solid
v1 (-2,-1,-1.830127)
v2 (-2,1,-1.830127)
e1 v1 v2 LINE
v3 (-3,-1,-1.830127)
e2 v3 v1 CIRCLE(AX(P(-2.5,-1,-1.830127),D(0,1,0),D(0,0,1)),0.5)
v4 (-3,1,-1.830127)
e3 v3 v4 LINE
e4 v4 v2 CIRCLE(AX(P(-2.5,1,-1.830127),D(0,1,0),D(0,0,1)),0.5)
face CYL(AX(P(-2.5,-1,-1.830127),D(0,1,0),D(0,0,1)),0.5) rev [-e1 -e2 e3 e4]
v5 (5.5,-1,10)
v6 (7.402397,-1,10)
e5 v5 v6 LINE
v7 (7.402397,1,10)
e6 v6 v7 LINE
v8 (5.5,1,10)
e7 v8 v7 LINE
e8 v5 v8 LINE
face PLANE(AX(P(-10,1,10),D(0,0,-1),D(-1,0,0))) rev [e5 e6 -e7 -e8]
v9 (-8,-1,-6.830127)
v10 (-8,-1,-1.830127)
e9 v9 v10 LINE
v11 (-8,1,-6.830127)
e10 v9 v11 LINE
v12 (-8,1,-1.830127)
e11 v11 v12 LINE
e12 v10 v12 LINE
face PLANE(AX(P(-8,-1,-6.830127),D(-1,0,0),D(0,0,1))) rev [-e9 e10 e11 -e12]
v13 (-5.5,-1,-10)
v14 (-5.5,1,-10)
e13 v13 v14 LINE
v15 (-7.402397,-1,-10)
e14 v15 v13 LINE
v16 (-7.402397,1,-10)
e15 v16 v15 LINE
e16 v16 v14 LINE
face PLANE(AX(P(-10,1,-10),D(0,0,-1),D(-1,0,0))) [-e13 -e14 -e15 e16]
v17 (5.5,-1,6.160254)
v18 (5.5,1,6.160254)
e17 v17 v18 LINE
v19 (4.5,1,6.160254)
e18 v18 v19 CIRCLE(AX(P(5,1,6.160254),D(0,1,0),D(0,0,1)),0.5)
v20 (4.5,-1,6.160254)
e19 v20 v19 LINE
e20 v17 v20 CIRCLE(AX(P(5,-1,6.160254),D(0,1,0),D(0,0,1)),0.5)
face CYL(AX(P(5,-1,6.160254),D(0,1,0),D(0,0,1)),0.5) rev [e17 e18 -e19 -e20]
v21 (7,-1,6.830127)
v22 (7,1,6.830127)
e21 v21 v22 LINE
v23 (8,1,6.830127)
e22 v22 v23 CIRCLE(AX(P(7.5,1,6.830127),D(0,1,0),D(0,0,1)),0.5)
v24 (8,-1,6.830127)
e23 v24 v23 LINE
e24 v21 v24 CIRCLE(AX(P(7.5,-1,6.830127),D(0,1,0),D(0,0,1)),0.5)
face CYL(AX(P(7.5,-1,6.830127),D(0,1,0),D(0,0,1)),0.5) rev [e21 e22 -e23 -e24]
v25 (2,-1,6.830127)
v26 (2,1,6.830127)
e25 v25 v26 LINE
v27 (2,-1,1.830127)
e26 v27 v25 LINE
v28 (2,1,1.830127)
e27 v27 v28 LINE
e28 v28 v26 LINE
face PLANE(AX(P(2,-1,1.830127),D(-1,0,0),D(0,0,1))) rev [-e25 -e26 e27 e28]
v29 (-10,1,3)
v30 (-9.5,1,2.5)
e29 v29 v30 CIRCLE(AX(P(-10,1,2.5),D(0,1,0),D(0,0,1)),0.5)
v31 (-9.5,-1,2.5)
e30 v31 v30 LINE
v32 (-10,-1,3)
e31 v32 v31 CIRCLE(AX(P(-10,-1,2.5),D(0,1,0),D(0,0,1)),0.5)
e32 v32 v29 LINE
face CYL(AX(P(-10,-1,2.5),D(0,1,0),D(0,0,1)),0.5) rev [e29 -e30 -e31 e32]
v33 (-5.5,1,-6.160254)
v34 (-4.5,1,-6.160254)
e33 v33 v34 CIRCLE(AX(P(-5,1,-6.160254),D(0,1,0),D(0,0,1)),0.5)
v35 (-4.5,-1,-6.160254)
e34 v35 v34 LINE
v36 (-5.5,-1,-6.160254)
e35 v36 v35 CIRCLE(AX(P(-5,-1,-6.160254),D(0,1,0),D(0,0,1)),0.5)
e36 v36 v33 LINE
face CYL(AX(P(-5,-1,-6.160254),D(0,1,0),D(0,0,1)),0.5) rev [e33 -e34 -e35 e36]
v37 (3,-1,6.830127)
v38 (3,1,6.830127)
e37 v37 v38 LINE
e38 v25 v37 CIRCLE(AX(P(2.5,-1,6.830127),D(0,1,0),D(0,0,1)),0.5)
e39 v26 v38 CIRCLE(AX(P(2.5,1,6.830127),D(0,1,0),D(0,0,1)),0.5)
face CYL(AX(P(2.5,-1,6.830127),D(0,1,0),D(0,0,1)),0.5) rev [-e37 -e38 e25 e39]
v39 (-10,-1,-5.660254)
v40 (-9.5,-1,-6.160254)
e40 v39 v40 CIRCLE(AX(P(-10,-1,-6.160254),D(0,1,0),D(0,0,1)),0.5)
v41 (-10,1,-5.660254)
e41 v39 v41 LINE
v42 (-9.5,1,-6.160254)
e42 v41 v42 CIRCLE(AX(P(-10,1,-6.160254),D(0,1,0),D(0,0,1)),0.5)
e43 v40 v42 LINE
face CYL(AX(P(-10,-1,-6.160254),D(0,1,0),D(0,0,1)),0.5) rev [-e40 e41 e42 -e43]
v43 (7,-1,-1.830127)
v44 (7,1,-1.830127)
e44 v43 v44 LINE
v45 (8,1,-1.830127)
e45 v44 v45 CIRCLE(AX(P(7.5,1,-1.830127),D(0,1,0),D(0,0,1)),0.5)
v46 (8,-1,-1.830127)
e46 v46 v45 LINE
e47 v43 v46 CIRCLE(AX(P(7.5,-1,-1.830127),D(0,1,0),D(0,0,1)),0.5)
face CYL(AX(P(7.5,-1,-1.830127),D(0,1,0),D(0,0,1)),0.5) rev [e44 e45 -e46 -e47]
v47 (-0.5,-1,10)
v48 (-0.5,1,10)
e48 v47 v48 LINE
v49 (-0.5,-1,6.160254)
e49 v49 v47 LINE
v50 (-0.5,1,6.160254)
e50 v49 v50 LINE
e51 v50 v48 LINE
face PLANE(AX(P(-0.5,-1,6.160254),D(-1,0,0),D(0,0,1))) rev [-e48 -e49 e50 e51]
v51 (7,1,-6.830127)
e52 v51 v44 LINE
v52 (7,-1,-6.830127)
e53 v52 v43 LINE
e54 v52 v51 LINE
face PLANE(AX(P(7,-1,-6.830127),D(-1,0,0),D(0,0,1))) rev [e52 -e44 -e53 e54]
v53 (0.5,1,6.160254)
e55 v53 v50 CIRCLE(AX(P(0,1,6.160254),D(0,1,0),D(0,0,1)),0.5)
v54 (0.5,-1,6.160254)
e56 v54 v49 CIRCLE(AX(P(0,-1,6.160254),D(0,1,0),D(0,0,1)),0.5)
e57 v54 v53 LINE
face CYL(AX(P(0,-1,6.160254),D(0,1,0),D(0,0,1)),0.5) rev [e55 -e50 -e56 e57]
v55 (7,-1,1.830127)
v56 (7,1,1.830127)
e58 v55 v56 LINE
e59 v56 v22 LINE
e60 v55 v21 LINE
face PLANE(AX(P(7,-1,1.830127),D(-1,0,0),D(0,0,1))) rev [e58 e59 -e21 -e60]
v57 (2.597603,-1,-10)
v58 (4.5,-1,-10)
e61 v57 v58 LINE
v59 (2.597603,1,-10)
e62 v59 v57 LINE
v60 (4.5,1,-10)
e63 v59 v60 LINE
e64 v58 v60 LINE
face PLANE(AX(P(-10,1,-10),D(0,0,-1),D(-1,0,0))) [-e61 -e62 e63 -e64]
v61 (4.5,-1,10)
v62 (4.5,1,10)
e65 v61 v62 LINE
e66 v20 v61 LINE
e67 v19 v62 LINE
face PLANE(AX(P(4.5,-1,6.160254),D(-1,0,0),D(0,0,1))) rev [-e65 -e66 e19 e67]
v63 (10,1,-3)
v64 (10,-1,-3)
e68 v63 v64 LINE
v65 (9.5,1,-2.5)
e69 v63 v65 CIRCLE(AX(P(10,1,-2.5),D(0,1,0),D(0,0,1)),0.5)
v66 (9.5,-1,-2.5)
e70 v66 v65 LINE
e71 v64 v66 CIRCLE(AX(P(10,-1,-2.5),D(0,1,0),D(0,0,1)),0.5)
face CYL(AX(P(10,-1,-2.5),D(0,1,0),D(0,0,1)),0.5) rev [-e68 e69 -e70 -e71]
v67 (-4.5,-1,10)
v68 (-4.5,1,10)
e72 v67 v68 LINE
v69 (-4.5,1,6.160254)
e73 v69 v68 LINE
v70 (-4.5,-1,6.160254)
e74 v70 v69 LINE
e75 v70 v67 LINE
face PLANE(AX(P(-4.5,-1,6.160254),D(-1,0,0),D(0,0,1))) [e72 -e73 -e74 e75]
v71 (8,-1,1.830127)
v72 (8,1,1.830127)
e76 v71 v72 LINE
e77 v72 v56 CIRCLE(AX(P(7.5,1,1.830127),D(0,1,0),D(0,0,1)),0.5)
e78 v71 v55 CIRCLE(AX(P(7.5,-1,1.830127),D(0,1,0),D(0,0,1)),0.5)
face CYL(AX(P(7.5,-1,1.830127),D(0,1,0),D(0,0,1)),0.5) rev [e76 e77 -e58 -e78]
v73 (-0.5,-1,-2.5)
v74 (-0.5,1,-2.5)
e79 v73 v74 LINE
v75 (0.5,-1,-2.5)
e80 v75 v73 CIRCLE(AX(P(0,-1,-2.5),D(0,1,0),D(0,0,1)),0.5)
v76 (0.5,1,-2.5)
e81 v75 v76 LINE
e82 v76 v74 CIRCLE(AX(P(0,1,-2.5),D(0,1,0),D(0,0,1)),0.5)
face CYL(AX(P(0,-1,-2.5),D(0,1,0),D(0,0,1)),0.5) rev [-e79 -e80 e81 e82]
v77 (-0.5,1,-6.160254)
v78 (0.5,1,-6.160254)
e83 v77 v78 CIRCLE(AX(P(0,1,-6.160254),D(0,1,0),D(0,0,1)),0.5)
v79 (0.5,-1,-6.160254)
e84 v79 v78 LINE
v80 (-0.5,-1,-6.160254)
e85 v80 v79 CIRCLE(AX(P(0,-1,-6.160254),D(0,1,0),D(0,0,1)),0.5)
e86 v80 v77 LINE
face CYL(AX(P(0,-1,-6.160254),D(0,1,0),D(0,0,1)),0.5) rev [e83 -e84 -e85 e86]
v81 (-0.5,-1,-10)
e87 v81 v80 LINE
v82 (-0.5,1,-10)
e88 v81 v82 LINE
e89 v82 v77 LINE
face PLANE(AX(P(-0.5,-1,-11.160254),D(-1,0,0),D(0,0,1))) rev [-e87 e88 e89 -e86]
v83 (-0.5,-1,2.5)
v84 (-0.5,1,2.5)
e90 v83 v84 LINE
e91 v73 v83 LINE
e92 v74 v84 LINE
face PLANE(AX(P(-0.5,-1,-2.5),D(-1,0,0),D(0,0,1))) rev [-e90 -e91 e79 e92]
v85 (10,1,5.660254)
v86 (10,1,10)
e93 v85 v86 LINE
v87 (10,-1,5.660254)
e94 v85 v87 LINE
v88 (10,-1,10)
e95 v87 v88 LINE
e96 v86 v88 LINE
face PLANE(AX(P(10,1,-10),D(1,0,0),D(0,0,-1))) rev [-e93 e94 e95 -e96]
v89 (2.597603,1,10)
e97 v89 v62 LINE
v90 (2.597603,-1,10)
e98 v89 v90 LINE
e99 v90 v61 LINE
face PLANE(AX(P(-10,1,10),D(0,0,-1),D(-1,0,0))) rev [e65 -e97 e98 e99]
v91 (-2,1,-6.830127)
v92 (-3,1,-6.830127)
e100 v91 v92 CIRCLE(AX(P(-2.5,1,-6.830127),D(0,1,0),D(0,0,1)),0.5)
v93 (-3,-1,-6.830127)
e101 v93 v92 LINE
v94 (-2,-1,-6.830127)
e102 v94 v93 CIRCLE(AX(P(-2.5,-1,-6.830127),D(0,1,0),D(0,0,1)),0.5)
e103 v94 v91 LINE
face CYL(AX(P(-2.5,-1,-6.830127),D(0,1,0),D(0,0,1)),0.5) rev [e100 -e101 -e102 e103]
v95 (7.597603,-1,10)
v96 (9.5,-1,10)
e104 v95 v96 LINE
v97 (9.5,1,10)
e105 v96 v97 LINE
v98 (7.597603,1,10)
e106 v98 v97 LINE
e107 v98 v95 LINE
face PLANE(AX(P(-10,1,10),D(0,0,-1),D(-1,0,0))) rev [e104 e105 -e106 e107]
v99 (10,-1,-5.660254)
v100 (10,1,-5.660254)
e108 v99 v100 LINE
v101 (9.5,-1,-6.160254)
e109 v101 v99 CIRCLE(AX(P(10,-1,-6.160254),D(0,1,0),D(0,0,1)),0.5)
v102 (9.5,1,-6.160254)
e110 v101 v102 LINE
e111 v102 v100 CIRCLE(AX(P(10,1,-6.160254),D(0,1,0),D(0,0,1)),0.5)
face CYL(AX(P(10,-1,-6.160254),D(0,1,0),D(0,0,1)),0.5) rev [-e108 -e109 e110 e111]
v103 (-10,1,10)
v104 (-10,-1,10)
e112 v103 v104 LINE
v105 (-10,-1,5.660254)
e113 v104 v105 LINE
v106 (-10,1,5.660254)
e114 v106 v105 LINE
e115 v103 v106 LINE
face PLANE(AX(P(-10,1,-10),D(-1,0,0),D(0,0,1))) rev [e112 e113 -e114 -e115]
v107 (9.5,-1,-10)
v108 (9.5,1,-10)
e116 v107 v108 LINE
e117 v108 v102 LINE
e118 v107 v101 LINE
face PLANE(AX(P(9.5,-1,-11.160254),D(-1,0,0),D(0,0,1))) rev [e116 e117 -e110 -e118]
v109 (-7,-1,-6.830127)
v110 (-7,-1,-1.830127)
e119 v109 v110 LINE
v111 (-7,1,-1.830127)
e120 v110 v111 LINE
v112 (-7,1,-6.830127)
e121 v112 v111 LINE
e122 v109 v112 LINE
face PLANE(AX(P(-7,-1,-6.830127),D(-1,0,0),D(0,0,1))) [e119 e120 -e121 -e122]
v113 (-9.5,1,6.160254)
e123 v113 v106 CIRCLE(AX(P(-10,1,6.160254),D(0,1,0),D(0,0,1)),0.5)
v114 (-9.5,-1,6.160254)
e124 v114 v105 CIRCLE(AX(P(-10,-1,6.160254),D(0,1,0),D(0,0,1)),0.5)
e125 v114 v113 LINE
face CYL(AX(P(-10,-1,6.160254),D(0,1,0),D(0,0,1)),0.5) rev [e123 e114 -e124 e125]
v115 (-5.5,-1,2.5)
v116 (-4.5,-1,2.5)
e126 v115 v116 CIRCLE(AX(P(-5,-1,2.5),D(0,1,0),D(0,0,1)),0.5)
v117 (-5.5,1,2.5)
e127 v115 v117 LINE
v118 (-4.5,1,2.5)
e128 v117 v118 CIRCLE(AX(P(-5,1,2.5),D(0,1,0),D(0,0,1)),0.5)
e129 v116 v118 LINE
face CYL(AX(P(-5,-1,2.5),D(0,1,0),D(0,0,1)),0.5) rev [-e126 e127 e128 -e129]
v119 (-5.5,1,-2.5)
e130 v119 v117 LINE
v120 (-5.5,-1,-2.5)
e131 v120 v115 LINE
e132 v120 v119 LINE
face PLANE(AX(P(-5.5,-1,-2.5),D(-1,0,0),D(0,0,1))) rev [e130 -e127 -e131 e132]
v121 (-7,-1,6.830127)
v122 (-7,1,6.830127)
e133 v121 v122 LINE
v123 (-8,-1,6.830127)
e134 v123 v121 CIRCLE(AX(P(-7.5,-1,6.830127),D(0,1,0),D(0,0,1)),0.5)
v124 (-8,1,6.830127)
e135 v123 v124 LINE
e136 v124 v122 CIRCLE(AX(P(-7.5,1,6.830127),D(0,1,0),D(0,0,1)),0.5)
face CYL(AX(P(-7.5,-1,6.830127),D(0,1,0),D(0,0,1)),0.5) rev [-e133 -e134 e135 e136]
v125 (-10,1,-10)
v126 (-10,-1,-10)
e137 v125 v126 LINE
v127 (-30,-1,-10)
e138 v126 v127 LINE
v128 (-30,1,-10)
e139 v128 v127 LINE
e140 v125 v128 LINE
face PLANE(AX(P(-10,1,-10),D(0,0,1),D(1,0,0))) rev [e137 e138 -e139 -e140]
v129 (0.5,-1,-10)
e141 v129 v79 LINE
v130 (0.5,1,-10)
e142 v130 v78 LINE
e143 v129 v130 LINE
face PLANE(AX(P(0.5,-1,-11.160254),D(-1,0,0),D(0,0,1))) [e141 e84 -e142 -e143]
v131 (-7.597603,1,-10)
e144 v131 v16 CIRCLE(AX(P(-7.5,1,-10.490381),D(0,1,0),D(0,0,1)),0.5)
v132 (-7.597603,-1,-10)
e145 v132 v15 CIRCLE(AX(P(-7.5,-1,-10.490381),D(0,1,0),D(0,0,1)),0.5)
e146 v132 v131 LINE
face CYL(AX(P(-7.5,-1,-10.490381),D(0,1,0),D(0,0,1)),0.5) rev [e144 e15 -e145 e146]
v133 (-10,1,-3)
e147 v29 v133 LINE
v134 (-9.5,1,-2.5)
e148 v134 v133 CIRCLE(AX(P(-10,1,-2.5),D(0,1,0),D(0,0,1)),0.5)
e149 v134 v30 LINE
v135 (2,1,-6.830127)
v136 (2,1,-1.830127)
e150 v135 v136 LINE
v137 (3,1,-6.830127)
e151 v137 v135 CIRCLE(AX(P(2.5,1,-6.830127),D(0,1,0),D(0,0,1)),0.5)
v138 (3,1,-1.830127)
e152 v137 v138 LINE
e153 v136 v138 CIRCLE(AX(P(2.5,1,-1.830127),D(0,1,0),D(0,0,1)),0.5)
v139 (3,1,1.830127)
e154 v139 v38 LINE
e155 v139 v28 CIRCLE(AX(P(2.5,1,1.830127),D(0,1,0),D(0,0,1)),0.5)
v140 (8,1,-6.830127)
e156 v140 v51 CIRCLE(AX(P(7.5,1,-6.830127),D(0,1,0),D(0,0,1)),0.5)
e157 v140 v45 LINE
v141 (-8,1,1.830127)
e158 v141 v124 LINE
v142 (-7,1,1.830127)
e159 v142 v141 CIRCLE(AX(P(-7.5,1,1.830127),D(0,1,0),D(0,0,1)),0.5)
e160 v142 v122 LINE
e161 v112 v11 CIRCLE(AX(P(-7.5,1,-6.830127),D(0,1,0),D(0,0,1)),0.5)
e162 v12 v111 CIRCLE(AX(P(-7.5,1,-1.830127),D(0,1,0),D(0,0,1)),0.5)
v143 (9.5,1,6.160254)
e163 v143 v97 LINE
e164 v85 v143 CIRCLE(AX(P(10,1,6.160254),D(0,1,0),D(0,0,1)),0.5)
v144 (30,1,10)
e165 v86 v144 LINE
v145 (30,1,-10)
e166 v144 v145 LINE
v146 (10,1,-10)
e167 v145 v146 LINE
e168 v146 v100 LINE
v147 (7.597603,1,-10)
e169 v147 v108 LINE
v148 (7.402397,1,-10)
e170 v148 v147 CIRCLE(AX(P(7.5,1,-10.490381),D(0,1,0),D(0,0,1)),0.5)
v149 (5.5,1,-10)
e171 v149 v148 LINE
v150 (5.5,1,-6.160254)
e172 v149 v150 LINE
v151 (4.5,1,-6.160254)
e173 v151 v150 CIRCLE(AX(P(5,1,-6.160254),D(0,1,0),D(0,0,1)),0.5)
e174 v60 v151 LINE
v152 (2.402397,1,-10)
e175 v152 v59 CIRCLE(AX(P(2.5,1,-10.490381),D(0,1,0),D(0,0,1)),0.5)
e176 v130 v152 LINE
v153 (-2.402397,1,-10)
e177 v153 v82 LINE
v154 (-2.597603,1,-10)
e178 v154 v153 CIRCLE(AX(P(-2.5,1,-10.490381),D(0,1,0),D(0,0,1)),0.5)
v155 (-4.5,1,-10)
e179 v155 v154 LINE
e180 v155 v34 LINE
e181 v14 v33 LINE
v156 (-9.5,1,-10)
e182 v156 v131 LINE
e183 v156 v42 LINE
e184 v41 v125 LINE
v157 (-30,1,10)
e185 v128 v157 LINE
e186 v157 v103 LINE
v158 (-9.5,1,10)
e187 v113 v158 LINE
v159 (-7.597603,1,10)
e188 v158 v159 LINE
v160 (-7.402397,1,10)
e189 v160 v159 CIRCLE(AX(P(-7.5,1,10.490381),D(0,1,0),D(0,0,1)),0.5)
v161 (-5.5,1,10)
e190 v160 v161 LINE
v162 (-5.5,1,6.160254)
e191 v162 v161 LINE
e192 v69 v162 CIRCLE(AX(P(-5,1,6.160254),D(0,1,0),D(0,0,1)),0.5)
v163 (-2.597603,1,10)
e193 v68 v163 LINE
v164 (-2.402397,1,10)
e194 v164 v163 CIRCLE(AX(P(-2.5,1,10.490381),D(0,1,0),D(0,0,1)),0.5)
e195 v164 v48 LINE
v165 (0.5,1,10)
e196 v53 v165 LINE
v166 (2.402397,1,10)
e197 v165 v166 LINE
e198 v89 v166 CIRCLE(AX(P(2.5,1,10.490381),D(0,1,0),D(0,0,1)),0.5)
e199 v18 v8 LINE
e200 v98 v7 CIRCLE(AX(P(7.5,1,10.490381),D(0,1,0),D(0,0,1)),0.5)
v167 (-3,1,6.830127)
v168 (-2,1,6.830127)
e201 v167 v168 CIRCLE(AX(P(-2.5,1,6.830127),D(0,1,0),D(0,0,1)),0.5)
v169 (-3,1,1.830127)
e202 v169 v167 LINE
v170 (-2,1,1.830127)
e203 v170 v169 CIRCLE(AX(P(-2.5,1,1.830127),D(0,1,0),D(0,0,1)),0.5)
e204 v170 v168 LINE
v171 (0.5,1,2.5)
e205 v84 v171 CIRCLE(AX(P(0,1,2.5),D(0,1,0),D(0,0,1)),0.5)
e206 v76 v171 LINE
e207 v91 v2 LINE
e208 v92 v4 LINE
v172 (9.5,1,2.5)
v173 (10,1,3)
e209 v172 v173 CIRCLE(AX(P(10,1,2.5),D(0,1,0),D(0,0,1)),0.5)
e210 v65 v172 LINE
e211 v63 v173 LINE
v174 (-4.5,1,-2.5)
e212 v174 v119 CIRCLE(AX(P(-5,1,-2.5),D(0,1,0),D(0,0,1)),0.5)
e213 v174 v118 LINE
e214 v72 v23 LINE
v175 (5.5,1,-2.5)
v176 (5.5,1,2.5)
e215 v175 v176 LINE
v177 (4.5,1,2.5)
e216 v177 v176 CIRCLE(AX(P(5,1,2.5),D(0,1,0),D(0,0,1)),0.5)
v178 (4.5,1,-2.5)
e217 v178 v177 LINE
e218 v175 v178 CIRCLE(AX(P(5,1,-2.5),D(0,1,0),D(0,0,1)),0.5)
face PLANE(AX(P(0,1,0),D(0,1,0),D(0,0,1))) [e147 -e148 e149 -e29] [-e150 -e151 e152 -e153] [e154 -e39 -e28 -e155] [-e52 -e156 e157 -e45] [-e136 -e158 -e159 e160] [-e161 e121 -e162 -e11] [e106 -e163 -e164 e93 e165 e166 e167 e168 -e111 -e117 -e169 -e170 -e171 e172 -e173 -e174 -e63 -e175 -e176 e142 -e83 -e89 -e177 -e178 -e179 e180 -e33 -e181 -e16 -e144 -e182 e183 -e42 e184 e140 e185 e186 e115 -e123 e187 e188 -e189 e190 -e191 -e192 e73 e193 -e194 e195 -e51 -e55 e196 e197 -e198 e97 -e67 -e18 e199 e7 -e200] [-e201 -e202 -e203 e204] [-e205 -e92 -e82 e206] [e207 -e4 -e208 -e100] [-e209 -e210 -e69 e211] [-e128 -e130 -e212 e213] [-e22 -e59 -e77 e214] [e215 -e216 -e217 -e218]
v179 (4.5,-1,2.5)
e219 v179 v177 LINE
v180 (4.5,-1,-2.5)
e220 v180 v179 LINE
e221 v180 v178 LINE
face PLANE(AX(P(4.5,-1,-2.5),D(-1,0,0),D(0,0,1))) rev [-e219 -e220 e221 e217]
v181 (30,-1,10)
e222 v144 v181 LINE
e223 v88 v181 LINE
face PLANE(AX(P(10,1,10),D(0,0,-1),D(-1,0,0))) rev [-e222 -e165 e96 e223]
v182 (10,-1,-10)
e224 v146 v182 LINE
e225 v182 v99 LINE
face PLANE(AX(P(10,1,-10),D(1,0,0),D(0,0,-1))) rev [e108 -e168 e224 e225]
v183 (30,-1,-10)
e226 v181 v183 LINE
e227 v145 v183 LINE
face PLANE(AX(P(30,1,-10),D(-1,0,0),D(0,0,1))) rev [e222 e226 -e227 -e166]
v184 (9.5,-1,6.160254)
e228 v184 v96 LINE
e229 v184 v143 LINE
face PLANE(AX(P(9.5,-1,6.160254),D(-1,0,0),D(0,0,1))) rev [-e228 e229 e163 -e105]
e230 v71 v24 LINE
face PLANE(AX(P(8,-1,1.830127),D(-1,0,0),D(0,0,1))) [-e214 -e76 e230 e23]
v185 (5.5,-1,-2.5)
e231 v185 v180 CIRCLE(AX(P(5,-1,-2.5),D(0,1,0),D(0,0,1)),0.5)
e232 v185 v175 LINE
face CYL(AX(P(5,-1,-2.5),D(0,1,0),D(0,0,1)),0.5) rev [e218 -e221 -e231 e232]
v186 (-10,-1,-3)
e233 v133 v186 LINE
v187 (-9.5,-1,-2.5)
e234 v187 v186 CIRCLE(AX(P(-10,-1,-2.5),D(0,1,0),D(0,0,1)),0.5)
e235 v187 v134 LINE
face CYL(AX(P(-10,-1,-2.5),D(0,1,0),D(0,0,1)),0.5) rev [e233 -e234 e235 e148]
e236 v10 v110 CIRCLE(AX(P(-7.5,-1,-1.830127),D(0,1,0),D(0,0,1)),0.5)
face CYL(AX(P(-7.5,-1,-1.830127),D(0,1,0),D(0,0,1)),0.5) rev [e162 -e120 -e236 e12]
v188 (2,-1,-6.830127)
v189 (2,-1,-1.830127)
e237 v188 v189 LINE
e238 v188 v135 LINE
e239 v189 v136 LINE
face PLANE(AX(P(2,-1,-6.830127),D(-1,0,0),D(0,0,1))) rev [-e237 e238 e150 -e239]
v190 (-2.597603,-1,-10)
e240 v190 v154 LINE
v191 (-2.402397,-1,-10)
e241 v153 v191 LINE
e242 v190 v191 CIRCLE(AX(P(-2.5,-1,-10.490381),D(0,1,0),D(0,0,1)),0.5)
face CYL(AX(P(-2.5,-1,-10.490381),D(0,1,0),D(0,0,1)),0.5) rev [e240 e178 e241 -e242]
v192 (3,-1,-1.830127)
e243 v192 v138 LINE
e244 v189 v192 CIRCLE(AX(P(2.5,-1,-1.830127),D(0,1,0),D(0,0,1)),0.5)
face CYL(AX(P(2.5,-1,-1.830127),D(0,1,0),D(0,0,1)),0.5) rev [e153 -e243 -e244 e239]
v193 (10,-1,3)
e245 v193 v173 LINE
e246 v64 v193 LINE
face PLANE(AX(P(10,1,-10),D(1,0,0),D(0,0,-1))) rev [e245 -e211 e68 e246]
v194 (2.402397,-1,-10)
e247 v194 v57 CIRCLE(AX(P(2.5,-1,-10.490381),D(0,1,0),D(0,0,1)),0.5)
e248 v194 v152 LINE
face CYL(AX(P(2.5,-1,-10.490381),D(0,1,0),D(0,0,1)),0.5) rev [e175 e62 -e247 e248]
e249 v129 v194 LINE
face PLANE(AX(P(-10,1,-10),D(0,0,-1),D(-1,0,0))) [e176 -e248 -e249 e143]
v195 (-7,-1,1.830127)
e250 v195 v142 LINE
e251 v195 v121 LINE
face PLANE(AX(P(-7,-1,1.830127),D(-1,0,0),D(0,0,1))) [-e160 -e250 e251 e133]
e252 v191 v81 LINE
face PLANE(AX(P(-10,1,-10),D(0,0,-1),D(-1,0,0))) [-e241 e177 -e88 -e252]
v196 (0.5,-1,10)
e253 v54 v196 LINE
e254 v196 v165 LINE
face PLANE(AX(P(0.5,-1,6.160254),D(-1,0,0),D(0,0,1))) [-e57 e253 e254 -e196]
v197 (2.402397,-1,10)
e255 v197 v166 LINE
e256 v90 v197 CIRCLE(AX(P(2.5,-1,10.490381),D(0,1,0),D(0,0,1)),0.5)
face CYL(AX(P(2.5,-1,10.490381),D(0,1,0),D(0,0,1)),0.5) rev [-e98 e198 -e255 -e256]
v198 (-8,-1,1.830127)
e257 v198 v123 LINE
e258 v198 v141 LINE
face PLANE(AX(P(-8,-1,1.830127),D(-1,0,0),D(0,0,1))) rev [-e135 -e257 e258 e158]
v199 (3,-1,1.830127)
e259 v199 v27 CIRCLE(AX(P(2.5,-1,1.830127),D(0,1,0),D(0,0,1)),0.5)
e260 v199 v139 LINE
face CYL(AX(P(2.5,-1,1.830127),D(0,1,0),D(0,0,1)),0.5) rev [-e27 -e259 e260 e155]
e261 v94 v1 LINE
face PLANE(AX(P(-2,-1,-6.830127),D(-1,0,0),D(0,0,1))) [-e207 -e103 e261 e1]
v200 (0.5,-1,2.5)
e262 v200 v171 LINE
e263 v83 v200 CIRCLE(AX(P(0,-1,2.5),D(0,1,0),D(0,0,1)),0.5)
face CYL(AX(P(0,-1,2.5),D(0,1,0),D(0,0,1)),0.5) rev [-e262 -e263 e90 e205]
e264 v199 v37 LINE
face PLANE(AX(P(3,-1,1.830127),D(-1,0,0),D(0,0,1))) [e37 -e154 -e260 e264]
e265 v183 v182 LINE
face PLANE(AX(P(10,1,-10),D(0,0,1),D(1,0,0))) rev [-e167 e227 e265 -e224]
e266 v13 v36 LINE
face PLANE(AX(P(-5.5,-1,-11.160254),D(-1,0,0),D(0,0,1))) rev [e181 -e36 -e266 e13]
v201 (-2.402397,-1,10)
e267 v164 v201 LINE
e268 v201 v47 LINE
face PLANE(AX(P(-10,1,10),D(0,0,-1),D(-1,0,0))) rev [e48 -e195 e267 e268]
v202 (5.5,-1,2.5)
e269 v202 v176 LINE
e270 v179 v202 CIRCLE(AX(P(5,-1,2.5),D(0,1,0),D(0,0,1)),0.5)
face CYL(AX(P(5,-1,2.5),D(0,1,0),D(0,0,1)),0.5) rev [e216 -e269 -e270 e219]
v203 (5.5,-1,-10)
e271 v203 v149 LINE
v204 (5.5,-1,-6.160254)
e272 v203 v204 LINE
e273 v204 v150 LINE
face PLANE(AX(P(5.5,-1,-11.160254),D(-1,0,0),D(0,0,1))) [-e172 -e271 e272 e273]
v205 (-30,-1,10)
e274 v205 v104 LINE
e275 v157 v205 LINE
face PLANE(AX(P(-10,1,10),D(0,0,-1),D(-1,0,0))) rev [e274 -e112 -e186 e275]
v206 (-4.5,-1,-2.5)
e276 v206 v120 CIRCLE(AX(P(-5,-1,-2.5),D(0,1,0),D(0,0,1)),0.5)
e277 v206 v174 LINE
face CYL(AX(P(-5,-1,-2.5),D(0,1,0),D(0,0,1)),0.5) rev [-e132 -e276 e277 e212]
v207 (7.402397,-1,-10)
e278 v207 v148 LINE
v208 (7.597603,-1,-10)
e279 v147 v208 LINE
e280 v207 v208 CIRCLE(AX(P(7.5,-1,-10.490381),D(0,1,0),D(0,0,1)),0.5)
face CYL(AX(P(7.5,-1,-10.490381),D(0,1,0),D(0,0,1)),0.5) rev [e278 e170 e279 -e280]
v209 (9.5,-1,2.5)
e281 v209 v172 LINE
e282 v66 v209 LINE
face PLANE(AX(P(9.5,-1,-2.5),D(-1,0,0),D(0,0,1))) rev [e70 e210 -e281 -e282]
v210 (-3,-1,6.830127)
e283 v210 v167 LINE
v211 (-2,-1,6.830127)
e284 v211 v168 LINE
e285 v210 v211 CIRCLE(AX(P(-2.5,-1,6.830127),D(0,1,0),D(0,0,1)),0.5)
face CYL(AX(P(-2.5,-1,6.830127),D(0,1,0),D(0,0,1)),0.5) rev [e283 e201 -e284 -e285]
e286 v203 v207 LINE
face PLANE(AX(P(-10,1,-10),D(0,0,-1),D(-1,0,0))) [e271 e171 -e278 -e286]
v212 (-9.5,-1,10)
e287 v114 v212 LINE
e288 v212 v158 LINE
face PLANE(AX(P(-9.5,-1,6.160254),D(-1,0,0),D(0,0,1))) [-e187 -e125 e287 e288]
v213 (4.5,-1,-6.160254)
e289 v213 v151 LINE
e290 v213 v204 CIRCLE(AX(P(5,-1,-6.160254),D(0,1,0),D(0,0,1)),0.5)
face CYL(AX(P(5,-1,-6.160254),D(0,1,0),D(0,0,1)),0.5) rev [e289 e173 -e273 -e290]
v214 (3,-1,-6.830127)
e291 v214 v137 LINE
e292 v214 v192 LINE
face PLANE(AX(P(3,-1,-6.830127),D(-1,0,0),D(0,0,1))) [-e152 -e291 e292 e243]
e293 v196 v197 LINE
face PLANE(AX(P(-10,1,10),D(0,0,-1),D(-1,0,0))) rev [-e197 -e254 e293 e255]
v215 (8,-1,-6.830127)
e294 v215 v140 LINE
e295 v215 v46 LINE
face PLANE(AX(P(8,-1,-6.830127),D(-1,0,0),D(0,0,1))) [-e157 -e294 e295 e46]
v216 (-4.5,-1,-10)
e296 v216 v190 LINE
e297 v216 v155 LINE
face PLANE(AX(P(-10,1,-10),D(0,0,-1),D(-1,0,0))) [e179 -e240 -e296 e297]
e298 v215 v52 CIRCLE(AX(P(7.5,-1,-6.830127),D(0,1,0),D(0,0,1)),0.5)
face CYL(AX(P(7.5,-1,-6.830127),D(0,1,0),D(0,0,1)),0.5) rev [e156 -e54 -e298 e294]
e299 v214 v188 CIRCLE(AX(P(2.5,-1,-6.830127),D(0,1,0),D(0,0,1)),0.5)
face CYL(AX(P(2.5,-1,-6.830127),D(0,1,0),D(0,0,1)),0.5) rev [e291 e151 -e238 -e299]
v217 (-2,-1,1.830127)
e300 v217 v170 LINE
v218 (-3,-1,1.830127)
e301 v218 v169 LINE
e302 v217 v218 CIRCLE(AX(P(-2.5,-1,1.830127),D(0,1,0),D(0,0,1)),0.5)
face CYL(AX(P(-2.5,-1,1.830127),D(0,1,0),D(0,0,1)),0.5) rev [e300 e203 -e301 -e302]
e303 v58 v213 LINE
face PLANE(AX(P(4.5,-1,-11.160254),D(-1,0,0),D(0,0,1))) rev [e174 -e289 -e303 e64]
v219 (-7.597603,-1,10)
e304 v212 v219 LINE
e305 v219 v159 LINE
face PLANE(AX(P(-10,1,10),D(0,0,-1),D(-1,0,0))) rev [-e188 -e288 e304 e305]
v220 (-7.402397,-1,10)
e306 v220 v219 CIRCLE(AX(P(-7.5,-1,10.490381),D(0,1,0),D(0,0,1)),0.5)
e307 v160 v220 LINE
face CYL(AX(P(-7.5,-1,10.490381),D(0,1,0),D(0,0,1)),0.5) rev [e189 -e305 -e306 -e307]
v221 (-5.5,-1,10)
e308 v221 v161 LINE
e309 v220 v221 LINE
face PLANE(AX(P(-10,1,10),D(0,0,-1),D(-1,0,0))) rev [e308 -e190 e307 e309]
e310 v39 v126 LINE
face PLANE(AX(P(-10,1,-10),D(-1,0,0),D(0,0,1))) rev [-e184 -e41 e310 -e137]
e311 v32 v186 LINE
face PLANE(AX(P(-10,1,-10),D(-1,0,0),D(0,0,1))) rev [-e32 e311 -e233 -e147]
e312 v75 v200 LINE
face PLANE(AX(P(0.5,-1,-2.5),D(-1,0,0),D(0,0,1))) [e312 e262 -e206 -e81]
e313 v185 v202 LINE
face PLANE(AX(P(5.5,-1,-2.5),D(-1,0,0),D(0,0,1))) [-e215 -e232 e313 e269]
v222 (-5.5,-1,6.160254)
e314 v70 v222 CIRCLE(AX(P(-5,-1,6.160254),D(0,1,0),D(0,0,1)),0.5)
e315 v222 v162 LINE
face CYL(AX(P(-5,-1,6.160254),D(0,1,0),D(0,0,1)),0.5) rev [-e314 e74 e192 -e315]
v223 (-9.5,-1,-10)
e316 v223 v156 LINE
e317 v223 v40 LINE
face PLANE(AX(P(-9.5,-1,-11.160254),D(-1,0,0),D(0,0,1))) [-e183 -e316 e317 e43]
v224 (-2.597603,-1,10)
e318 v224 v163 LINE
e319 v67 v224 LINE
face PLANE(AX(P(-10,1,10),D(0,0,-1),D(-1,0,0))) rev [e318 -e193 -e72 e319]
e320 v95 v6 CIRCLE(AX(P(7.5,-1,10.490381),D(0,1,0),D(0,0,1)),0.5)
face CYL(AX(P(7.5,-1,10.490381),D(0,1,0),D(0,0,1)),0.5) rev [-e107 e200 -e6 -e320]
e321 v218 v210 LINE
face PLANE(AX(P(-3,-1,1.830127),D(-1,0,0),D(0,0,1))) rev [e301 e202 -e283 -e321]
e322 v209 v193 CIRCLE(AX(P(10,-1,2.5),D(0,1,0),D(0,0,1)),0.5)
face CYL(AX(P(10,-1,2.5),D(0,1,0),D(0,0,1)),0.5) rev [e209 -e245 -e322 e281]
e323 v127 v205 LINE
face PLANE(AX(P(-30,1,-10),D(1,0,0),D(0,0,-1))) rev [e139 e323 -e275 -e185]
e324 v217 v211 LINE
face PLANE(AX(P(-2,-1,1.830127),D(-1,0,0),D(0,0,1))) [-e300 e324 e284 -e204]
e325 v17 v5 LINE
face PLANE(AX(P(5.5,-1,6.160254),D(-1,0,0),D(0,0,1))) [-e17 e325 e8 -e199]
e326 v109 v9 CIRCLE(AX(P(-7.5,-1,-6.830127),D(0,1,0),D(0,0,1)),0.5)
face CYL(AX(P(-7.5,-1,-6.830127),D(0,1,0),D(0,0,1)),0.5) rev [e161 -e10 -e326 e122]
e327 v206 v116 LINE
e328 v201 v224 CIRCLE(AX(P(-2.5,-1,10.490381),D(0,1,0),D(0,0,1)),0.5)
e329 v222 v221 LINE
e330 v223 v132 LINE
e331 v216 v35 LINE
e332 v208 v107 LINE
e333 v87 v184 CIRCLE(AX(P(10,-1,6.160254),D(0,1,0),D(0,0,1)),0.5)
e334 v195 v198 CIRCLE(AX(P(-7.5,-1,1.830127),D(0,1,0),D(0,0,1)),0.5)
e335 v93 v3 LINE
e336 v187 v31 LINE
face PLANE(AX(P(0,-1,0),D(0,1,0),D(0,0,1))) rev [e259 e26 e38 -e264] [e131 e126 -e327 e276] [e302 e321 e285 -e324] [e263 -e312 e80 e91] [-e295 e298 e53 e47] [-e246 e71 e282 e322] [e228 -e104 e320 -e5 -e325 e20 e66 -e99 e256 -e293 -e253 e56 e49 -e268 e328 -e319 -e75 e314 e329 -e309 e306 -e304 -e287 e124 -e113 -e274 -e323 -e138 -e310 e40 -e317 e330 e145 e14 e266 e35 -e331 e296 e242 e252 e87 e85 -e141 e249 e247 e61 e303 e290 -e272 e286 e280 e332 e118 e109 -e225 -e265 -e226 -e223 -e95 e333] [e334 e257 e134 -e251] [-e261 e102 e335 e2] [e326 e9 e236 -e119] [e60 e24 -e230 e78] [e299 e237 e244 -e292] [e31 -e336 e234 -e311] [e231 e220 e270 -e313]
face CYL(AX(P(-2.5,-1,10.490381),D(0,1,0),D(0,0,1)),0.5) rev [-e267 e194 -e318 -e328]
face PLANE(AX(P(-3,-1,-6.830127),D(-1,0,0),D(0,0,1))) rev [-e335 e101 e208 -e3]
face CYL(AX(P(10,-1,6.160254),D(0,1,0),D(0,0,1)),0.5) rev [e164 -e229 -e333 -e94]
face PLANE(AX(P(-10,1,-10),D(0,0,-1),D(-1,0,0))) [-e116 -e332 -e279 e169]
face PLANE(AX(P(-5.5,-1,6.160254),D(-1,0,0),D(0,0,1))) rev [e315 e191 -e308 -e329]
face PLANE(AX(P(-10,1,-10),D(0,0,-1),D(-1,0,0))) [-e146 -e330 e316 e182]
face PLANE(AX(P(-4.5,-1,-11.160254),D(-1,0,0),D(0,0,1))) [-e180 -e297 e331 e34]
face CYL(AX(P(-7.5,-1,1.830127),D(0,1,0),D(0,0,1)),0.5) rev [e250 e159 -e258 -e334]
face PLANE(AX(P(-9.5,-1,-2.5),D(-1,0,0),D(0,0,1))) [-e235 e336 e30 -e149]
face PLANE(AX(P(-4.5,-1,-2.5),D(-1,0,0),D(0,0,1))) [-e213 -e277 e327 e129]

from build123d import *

# Parameters (mm, degrees)
SKETCH1_W           = 20
SKETCH1_H           = 20
BOSS_EXTRUDE1_DEPTH = 1
CUT_EXTRUDE1_DEPTH  = 1
FILL_START          = -1
FILL_PATTERN1_DEPTH = 2
SKETCH2_W           = 20
SKETCH2_H           = 20
BOSS_EXTRUDE2_DEPTH = 1


# Read off the part's stored shape, not the designer's step: Fill Pattern1
with BuildPart() as part:
    # Sketch1 → Boss-Extrude1 (new, symmetric)
    with BuildSketch(Plane(origin=(0, 0, 0), x_dir=(1, 0, 0), z_dir=(0, 1, 0))):
        Rectangle(SKETCH1_W, SKETCH1_H)
    extrude(amount=BOSS_EXTRUDE1_DEPTH, both=True)

    # Sketch1<4> → Cut-Extrude1 (cut, symmetric)
    with BuildSketch(Plane(origin=(0, 0, 0), x_dir=(1, 0, 0), z_dir=(0, 1, 0))):
        with BuildLine():
            Line((0.5, 2.5), (0.5, -2.5))
            ThreePointArc((0.5, -2.5), (0, -3), (-0.5, -2.5))
            Line((-0.5, -2.5), (-0.5, 2.5))
            ThreePointArc((-0.5, 2.5), (0, 3), (0.5, 2.5))
        make_face()
    extrude(amount=CUT_EXTRUDE1_DEPTH, both=True, mode=Mode.SUBTRACT)

    # Fill Pattern1 outline → Fill Pattern1 (cut)
    with BuildSketch(Plane(origin=(0, 0, 0), x_dir=(1, 0, 0), z_dir=(0, 1, 0)).offset(FILL_START)):
        with BuildLine():
            Line((0.5, -10), (0.5, -6.160254038))
            ThreePointArc((0.5, -6.160254038), (0, -5.660254038), (-0.5, -6.160254038))
            Line((-0.5, -6.160254038), (-0.5, -10))
            Line((-0.5, -10), (0.5, -10))
        make_face()
        with BuildLine():
            ThreePointArc((2.597603377, -10), (2.5, -9.990381057), (2.402396623, -10))
            Line((2.402396623, -10), (2.597603377, -10))
        make_face()
        with BuildLine():
            Line((-2.597603377, -10), (-2.402396623, -10))
            ThreePointArc((-2.402396623, -10), (-2.5, -9.990381057), (-2.597603377, -10))
        make_face()
        with BuildLine():
            Line((4.5, -6.160254038), (4.5, -10))
            Line((4.5, -10), (5.5, -10))
            Line((5.5, -10), (5.5, -6.160254038))
            ThreePointArc((5.5, -6.160254038), (5, -5.660254038), (4.5, -6.160254038))
        make_face()
        with BuildLine():
            Line((-5.5, -10), (-4.5, -10))
            Line((-4.5, -10), (-4.5, -6.160254038))
            ThreePointArc((-4.5, -6.160254038), (-5, -5.660254038), (-5.5, -6.160254038))
            Line((-5.5, -6.160254038), (-5.5, -10))
        make_face()
        with BuildLine():
            ThreePointArc((7.597603377, -10), (7.5, -9.990381057), (7.402396623, -10))
            Line((7.402396623, -10), (7.597603377, -10))
        make_face()
        with BuildLine():
            Line((-7.597603377, -10), (-7.402396623, -10))
            ThreePointArc((-7.402396623, -10), (-7.5, -9.990381057), (-7.597603377, -10))
        make_face()
        with BuildLine():
            Line((9.5, -6.160254038), (9.5, -10))
            Line((9.5, -10), (10, -10))
            Line((10, -10), (10, -5.660254038))
            ThreePointArc((10, -5.660254038), (9.646446609, -5.806700647), (9.5, -6.160254038))
        make_face()
        with BuildLine():
            Line((-10, -10), (-9.5, -10))
            Line((-9.5, -10), (-9.5, -6.160254038))
            ThreePointArc((-9.5, -6.160254038), (-9.646446609, -5.806700647), (-10, -5.660254038))
            Line((-10, -5.660254038), (-10, -10))
        make_face()
        with BuildLine():
            ThreePointArc((9.5, -2.5), (9.646446609, -2.853553391), (10, -3))
            Line((10, -3), (10, 3))
            ThreePointArc((10, 3), (9.646446609, 2.853553391), (9.5, 2.5))
            Line((9.5, 2.5), (9.5, -2.5))
        make_face()
        with BuildLine():
            Line((-10, 3), (-10, -3))
            ThreePointArc((-10, -3), (-9.646446609, -2.853553391), (-9.5, -2.5))
            Line((-9.5, -2.5), (-9.5, 2.5))
            ThreePointArc((-9.5, 2.5), (-9.646446609, 2.853553391), (-10, 3))
        make_face()
        with BuildLine():
            ThreePointArc((9.5, 6.160254038), (9.646446609, 5.806700647), (10, 5.660254038))
            Line((10, 5.660254038), (10, 10))
            Line((10, 10), (9.5, 10))
            Line((9.5, 10), (9.5, 6.160254038))
        make_face()
        with BuildLine():
            Line((-10, 10), (-10, 5.660254038))
            ThreePointArc((-10, 5.660254038), (-9.646446609, 5.806700647), (-9.5, 6.160254038))
            Line((-9.5, 6.160254038), (-9.5, 10))
            Line((-9.5, 10), (-10, 10))
        make_face()
        with BuildLine():
            ThreePointArc((7.402396623, 10), (7.5, 9.990381057), (7.597603377, 10))
            Line((7.597603377, 10), (7.402396623, 10))
        make_face()
        with BuildLine():
            Line((-7.402396623, 10), (-7.597603377, 10))
            ThreePointArc((-7.597603377, 10), (-7.5, 9.990381057), (-7.402396623, 10))
        make_face()
        with BuildLine():
            Line((5.5, 6.160254038), (5.5, 10))
            Line((5.5, 10), (4.5, 10))
            Line((4.5, 10), (4.5, 6.160254038))
            ThreePointArc((4.5, 6.160254038), (5, 5.660254038), (5.5, 6.160254038))
        make_face()
        with BuildLine():
            Line((-4.5, 10), (-5.5, 10))
            Line((-5.5, 10), (-5.5, 6.160254038))
            ThreePointArc((-5.5, 6.160254038), (-5, 5.660254038), (-4.5, 6.160254038))
            Line((-4.5, 6.160254038), (-4.5, 10))
        make_face()
        with BuildLine():
            ThreePointArc((2.402396623, 10), (2.5, 9.990381057), (2.597603377, 10))
            Line((2.597603377, 10), (2.402396623, 10))
        make_face()
        with BuildLine():
            Line((-2.402396623, 10), (-2.597603377, 10))
            ThreePointArc((-2.597603377, 10), (-2.5, 9.990381057), (-2.402396623, 10))
        make_face()
        with BuildLine():
            Line((0.5, 6.160254038), (0.5, 10))
            Line((0.5, 10), (-0.5, 10))
            Line((-0.5, 10), (-0.5, 6.160254038))
            ThreePointArc((-0.5, 6.160254038), (0, 5.660254038), (0.5, 6.160254038))
        make_face()
        with BuildLine():
            Line((8, -6.830127019), (8, -1.830127019))
            ThreePointArc((8, -1.830127019), (7.5, -1.330127019), (7, -1.830127019))
            Line((7, -1.830127019), (7, -6.830127019))
            ThreePointArc((7, -6.830127019), (7.5, -7.330127019), (8, -6.830127019))
        make_face()
        with BuildLine():
            Line((8, 1.830127019), (8, 6.830127019))
            ThreePointArc((8, 6.830127019), (7.5, 7.330127019), (7, 6.830127019))
            Line((7, 6.830127019), (7, 1.830127019))
            ThreePointArc((7, 1.830127019), (7.5, 1.330127019), (8, 1.830127019))
        make_face()
        with BuildLine():
            Line((5.5, -2.5), (5.5, 2.5))
            ThreePointArc((5.5, 2.5), (5, 3), (4.5, 2.5))
            Line((4.5, 2.5), (4.5, -2.5))
            ThreePointArc((4.5, -2.5), (5, -3), (5.5, -2.5))
        make_face()
        with BuildLine():
            Line((-7, 1.830127019), (-7, 6.830127019))
            ThreePointArc((-7, 6.830127019), (-7.5, 7.330127019), (-8, 6.830127019))
            Line((-8, 6.830127019), (-8, 1.830127019))
            ThreePointArc((-8, 1.830127019), (-7.5, 1.330127019), (-7, 1.830127019))
        make_face()
        with BuildLine():
            Line((-7, -6.830127019), (-7, -1.830127019))
            ThreePointArc((-7, -1.830127019), (-7.5, -1.330127019), (-8, -1.830127019))
            Line((-8, -1.830127019), (-8, -6.830127019))
            ThreePointArc((-8, -6.830127019), (-7.5, -7.330127019), (-7, -6.830127019))
        make_face()
        with BuildLine():
            Line((-4.5, -2.5), (-4.5, 2.5))
            ThreePointArc((-4.5, 2.5), (-5, 3), (-5.5, 2.5))
            Line((-5.5, 2.5), (-5.5, -2.5))
            ThreePointArc((-5.5, -2.5), (-5, -3), (-4.5, -2.5))
        make_face()
        with BuildLine():
            Line((3, 1.830127019), (3, 6.830127019))
            ThreePointArc((3, 6.830127019), (2.5, 7.330127019), (2, 6.830127019))
            Line((2, 6.830127019), (2, 1.830127019))
            ThreePointArc((2, 1.830127019), (2.5, 1.330127019), (3, 1.830127019))
        make_face()
        with BuildLine():
            Line((3, -6.830127019), (3, -1.830127019))
            ThreePointArc((3, -1.830127019), (2.5, -1.330127019), (2, -1.830127019))
            Line((2, -1.830127019), (2, -6.830127019))
            ThreePointArc((2, -6.830127019), (2.5, -7.330127019), (3, -6.830127019))
        make_face()
        with BuildLine():
            Line((-2, 1.830127019), (-2, 6.830127019))
            ThreePointArc((-2, 6.830127019), (-2.5, 7.330127019), (-3, 6.830127019))
            Line((-3, 6.830127019), (-3, 1.830127019))
            ThreePointArc((-3, 1.830127019), (-2.5, 1.330127019), (-2, 1.830127019))
        make_face()
        with BuildLine():
            Line((-2, -6.830127019), (-2, -1.830127019))
            ThreePointArc((-2, -1.830127019), (-2.5, -1.330127019), (-3, -1.830127019))
            Line((-3, -1.830127019), (-3, -6.830127019))
            ThreePointArc((-3, -6.830127019), (-2.5, -7.330127019), (-2, -6.830127019))
        make_face()
    extrude(amount=FILL_PATTERN1_DEPTH, mode=Mode.SUBTRACT)

    # Sketch2 → Boss-Extrude2 (add, symmetric)
    with BuildSketch(Plane(origin=(0, 0, 0), x_dir=(1, 0, 0), z_dir=(0, 1, 0))):
        with Locations((-20, 0)):
            Rectangle(SKETCH2_W, SKETCH2_H)
        with Locations((20, 0)):
            Rectangle(SKETCH2_W, SKETCH2_H)
    extrude(amount=BOSS_EXTRUDE2_DEPTH, both=True)


solid = part.part
